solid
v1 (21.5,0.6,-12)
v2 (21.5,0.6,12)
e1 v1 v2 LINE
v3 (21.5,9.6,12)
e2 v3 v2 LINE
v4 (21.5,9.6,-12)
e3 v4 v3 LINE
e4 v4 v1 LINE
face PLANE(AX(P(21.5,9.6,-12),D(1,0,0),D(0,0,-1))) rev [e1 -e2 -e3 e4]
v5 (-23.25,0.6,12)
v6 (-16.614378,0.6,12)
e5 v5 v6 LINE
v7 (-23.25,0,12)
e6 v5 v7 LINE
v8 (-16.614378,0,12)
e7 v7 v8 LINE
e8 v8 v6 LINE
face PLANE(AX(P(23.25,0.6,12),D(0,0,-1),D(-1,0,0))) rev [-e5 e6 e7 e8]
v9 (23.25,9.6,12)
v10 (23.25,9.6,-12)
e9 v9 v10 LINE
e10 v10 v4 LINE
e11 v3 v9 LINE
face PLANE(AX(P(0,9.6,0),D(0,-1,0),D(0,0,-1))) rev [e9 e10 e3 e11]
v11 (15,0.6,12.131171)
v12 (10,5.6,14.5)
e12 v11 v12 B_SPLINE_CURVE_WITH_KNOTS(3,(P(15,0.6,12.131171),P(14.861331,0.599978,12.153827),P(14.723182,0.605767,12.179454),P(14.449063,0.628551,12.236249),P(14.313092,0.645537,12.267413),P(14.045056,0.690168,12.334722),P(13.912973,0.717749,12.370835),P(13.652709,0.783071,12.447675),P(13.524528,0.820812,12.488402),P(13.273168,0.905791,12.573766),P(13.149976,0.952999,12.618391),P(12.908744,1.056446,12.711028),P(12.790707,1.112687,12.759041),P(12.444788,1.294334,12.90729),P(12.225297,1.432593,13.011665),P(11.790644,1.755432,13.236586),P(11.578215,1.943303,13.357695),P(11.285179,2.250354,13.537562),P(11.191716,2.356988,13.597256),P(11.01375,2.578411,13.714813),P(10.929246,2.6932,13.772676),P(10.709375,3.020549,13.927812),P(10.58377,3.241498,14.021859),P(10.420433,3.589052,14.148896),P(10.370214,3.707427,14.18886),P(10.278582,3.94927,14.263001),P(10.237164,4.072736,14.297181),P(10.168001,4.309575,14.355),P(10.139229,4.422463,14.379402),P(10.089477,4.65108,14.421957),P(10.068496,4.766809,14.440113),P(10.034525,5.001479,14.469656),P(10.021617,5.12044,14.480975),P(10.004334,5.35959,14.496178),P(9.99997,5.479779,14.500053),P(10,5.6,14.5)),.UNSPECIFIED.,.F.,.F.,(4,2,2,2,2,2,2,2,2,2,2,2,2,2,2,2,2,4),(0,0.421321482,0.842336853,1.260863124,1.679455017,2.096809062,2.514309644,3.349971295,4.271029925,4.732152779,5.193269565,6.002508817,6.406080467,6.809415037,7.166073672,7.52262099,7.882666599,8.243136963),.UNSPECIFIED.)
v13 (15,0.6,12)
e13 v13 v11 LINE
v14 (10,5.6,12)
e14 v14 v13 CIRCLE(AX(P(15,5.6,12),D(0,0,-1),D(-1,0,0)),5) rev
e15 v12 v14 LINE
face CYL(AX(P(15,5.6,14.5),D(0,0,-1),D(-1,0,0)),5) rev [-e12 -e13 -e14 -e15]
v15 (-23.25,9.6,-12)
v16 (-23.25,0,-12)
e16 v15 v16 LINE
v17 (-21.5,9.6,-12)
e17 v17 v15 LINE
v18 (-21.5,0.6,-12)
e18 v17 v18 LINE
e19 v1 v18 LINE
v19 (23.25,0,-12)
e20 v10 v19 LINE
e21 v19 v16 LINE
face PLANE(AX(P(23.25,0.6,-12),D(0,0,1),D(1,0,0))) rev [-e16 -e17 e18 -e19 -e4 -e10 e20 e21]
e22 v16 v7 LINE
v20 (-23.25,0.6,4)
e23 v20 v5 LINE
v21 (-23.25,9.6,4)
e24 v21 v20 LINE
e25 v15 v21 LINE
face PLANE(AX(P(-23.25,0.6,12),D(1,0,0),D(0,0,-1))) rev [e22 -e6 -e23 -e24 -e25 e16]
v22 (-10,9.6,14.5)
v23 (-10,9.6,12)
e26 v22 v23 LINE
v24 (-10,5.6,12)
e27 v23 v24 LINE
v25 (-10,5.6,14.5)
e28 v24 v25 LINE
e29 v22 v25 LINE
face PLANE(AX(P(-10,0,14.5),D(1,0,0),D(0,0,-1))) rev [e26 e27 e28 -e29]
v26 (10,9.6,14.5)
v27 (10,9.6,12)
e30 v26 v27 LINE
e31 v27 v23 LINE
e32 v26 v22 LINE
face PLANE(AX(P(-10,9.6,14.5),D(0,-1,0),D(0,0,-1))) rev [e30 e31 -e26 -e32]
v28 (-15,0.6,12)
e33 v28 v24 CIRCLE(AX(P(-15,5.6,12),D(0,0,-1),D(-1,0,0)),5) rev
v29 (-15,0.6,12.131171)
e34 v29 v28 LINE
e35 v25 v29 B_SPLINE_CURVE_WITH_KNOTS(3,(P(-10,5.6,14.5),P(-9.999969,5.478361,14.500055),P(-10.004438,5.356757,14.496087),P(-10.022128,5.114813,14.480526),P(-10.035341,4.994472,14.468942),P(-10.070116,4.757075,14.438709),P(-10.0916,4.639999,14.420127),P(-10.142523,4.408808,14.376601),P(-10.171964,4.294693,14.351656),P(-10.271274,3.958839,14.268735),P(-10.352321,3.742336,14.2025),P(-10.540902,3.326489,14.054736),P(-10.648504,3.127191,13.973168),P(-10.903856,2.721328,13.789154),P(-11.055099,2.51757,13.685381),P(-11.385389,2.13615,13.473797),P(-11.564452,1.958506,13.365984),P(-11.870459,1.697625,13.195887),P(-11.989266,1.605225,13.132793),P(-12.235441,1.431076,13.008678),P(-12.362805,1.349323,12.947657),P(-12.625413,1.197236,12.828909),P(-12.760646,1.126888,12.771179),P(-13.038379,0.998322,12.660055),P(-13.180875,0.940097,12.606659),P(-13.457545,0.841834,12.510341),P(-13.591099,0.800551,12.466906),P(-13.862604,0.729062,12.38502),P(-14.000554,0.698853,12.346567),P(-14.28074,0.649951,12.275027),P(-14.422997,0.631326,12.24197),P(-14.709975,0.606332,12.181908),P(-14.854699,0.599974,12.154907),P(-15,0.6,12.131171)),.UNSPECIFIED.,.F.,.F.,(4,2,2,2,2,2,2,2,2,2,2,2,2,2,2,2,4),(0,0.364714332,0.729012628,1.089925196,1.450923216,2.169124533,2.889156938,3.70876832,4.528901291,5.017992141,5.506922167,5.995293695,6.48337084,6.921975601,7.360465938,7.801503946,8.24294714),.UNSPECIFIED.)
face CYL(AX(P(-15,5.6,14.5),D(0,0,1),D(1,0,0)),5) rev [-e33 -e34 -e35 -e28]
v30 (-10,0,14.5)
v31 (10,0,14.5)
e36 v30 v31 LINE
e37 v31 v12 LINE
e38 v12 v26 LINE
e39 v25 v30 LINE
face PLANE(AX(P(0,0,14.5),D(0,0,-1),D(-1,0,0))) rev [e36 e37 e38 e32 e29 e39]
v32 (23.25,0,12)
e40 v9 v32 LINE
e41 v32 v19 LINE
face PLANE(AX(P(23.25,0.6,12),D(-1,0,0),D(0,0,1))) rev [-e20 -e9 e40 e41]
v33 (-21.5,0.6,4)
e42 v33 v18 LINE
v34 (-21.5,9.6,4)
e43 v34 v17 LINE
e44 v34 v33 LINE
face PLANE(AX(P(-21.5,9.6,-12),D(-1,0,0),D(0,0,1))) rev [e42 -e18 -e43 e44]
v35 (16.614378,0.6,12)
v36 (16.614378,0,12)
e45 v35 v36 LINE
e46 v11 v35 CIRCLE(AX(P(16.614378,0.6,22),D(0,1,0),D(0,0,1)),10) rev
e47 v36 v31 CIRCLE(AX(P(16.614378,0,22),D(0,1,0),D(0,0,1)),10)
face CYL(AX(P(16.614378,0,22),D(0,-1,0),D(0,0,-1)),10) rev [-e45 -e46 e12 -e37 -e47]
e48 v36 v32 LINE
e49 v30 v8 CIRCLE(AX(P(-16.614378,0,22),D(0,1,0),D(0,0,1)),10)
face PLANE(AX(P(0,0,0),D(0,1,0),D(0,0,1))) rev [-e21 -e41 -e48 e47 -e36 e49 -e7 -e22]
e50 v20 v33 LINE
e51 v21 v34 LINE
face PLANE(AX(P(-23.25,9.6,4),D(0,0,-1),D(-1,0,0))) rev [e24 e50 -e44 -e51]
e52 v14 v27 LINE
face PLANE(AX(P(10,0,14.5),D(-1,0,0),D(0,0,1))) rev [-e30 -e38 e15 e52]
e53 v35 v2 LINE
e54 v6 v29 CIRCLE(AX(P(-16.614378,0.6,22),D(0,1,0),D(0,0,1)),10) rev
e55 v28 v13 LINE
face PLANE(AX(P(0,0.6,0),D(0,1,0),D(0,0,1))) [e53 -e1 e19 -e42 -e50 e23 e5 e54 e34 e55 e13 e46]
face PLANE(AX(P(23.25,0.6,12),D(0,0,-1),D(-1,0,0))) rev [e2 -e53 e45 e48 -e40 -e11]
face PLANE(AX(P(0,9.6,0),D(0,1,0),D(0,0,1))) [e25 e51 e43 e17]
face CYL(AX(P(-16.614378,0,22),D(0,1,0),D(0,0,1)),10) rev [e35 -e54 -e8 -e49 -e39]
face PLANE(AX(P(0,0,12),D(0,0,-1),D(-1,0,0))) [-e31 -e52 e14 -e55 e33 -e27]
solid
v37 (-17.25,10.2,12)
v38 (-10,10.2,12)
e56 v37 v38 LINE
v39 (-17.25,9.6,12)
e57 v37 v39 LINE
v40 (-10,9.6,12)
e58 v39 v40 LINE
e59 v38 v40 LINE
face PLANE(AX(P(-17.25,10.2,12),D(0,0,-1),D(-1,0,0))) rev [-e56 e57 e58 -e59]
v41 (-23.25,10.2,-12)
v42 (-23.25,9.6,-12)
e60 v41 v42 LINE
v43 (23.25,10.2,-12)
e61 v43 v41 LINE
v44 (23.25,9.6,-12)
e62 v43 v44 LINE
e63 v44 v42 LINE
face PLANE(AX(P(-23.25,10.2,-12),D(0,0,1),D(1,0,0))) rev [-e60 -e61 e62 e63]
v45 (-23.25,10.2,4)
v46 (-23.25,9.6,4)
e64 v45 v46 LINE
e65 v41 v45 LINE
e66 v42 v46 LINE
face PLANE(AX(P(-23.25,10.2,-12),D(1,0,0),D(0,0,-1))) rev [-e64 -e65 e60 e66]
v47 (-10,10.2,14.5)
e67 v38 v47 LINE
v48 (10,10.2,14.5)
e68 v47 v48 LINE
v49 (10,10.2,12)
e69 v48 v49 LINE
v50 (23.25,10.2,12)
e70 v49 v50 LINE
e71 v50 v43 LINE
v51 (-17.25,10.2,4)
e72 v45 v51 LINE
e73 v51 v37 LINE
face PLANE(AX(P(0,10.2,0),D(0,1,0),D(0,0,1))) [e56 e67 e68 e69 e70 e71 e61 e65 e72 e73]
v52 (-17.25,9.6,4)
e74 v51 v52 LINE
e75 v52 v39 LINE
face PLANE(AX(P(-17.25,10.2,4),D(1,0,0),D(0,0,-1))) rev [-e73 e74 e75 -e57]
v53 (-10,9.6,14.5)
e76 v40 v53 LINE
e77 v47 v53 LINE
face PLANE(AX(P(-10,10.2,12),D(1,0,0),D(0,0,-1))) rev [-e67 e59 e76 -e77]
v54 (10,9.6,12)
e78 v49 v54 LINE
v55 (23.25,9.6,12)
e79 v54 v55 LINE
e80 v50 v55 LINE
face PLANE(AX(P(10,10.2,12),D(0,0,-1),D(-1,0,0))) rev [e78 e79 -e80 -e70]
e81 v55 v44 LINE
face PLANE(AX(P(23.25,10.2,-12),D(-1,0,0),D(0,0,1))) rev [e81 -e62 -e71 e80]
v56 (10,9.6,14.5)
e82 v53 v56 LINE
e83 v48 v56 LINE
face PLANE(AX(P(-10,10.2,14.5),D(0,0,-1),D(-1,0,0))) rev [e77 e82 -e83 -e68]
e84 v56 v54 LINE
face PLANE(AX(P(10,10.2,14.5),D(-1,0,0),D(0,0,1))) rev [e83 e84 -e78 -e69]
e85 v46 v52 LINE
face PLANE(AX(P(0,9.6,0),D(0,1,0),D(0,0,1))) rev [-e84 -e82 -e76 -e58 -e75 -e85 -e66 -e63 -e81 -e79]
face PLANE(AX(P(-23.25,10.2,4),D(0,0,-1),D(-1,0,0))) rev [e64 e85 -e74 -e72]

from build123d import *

# Parameters (mm, degrees)
SKETCH6_W            = 46.5
SKETCH6_H            = 24
BOSS_EXTRUDE4_DEPTH  = 0.6
SKETCH7_W            = 1.75
SKETCH7_H            = 24
SKETCH7_H_2          = 16
BOSS_EXTRUDE5_DEPTH  = 9
SKETCH8_W            = 20
SKETCH8_H            = 9.6
BOSS_EXTRUDE6_DEPTH  = 2.5
FILLET1_R            = 10
FILLET2_R            = 5
BOSS_EXTRUDE12_DEPTH = 0.6


with BuildPart() as part:
    # Sketch6 → Boss-Extrude4 (new body)
    with BuildSketch(Plane(origin=(0, 0, 0), x_dir=(1, 0, 0), z_dir=(0, 1, 0))):
        Rectangle(SKETCH6_W, SKETCH6_H)
    extrude(amount=BOSS_EXTRUDE4_DEPTH)

    # Sketch7 → Boss-Extrude5 (add)
    with BuildSketch(Plane(origin=(0, 0.6, 0), x_dir=(1, 0, 0), z_dir=(0, 1, 0))):
        with Locations((22.375, 0)):
            Rectangle(SKETCH7_W, SKETCH7_H)
        with Locations((-22.375, 4)):
            Rectangle(SKETCH7_W, SKETCH7_H_2)
    extrude(amount=BOSS_EXTRUDE5_DEPTH)

    # Sketch8 → Boss-Extrude6 (add)
    with BuildSketch(Plane.XY.offset(12)):
        with Locations((0, 4.8)):
            Rectangle(SKETCH8_W, SKETCH8_H)
    extrude(amount=BOSS_EXTRUDE6_DEPTH)

    # Fillet1
    # the kernel refuses this fillet: 10 mm, written as the material it adds along each edge
    with BuildSketch(Plane(origin=(-10, 0.6, 12), x_dir=(-1, 0, 0), z_dir=(0, -1, 0)), Plane(origin=(10, 0, 12), x_dir=(1, 0, 0), z_dir=(0, 1, 0))) as fillet1_piece_1:
        with BuildLine():
            CenterArc((6.614378278, -10), FILLET1_R, 90, 41.409622109)
            Line((0, -2.5), (0, 0))
            Line((0, 0), (6.614378278, 0))
        make_face()
    extrude(amount=0.6)

    # Fillet2
    # the kernel refuses this fillet: 5 mm, written as the material it adds along each edge
    with BuildSketch(Plane(origin=(-10, 0.6, 27), x_dir=(-1, 0, 0), z_dir=(0, 0, -1))) as fillet2_piece_1_section:
        with BuildLine():
            CenterArc((FILLET2_R, FILLET2_R), FILLET2_R, 180, 90)
            Line((0, FILLET2_R), (0, 0))
            Line((0, 0), (FILLET2_R, 0))
        make_face()
    fillet2_piece_1 = extrude(amount=15, mode=Mode.PRIVATE)
    fillet2_piece_1 = fillet2_piece_1 - Plane(origin=(-16.614378278, 1.904105076, 22), x_dir=(-1, 0, 0), z_dir=(0, 1, 0)) * Cylinder(10, 50, mode=Mode.PRIVATE)
    add(fillet2_piece_1)
    with BuildSketch(Plane(origin=(10, 0.6, 27), x_dir=(1, 0, 0), z_dir=(0, 0, -1))) as fillet2_piece_2_section:
        with BuildLine():
            CenterArc((FILLET2_R, -FILLET2_R), FILLET2_R, 90, 90)
            Line((0, -FILLET2_R), (0, 0))
            Line((0, 0), (FILLET2_R, 0))
        make_face()
    fillet2_piece_2 = extrude(amount=15, mode=Mode.PRIVATE)
    fillet2_piece_2 = fillet2_piece_2 - Plane(origin=(16.614378278, 1.904105076, 22), x_dir=(1, 0, 0), z_dir=(0, -1, 0)) * Cylinder(10, 50, mode=Mode.PRIVATE)
    add(fillet2_piece_2)


with BuildPart() as body_2:
    # Sketch10 → Boss-Extrude12 (new body)
    with BuildSketch(Plane(origin=(0, 9.6, 0), x_dir=(1, 0, 0), z_dir=(0, 1, 0))):
        Polygon((-23.25, 12), (23.25, 12), (23.25, -12), (10, -12), (10, -14.5), (-10, -14.5), (-10, -12), (-17.25, -12), (-17.25, -4), (-23.25, -4), align=None)
    extrude(amount=BOSS_EXTRUDE12_DEPTH)


solid = Compound([part.part, body_2.part])
